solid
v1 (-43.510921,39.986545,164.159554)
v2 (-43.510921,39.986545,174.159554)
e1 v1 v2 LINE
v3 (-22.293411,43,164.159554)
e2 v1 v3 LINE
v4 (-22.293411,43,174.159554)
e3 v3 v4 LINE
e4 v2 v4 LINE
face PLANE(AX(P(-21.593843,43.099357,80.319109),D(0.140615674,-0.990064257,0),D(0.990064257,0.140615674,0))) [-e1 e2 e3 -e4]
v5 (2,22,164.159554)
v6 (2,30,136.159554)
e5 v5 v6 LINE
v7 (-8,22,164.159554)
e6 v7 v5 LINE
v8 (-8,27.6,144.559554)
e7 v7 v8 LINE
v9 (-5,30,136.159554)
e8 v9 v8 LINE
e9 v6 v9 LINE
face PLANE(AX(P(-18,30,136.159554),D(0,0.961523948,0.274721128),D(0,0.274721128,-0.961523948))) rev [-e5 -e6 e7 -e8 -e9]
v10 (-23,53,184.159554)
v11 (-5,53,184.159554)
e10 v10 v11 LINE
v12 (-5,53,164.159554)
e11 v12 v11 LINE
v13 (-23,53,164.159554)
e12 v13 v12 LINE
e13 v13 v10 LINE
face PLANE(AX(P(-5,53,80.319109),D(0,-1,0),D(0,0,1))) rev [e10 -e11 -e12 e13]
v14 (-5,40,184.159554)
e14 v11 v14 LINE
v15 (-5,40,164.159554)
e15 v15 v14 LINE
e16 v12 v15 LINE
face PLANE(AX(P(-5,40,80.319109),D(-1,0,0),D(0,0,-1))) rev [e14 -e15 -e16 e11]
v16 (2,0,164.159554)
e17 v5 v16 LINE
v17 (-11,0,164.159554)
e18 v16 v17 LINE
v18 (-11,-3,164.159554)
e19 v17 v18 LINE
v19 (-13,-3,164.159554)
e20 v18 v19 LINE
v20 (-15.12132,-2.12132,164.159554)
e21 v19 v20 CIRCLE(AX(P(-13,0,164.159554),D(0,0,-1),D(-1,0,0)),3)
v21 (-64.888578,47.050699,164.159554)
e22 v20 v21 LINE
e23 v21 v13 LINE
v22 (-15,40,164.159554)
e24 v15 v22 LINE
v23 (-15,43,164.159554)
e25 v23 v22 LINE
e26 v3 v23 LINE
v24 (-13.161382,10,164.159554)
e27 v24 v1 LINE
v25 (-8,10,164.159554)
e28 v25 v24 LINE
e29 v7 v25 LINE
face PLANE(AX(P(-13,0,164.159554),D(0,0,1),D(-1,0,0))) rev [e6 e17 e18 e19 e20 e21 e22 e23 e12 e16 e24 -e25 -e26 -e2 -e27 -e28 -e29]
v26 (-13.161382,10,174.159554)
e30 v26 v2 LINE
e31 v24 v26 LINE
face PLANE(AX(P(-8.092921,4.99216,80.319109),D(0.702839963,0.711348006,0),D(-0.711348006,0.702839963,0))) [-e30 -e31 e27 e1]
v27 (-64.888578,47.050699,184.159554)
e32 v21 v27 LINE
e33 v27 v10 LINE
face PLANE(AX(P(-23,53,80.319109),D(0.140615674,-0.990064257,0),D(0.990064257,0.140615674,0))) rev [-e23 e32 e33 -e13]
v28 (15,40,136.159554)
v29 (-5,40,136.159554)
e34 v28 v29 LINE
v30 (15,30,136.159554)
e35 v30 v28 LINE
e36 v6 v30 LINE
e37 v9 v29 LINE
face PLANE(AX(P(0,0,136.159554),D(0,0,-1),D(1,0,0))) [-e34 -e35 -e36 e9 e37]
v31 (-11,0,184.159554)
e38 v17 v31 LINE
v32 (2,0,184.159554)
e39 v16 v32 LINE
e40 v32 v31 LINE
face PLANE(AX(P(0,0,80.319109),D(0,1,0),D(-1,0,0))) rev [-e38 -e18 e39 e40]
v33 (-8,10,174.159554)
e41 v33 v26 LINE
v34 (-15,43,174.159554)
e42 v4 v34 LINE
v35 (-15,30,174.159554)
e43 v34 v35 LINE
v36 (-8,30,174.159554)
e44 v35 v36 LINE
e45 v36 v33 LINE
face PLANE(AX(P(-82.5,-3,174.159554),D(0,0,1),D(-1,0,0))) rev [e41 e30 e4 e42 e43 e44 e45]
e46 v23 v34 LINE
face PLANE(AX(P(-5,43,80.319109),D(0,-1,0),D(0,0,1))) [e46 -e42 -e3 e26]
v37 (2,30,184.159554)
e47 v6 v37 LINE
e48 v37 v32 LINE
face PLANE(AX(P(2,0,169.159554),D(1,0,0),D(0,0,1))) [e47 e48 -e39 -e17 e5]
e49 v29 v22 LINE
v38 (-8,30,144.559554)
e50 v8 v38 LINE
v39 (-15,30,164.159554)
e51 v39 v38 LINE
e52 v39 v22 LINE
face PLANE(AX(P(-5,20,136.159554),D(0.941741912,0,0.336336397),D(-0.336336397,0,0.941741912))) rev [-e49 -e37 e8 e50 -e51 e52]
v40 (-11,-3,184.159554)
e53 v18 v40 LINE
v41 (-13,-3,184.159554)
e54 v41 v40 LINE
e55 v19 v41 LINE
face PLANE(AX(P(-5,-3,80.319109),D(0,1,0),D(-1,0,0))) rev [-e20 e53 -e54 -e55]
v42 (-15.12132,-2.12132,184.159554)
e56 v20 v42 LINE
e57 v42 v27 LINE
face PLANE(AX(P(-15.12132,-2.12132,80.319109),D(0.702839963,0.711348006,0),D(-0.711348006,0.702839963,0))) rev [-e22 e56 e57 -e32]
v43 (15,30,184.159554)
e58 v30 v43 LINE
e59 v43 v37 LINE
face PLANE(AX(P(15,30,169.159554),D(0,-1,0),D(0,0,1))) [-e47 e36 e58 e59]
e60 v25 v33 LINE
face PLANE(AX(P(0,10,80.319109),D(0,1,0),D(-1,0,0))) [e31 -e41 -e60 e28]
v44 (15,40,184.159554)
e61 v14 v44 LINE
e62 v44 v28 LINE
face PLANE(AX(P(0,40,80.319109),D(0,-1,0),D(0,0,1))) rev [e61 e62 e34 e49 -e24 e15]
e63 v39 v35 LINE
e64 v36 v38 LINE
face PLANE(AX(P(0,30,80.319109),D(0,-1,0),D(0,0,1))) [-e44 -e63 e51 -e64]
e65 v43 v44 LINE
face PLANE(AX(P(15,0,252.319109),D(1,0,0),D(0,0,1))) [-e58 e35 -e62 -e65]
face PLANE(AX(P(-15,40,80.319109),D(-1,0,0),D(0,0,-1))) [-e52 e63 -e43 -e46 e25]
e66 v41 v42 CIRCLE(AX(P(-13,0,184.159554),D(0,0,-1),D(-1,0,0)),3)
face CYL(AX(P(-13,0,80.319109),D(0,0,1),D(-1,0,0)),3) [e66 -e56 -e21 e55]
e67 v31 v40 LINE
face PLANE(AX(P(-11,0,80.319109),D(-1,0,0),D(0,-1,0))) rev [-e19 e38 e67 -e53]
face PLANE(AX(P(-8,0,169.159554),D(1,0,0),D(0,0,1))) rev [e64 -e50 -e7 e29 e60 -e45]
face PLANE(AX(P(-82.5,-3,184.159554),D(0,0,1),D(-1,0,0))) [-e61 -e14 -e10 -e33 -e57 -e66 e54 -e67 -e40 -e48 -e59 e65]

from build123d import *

# Parameters (mm, degrees)
EXTRUDE_1_DEPTH       = 172
SHELL_START           = 6
SHELL_1_DEPTH         = 160
SKETCH_2_W            = 36
SKETCH_2_H            = 16
CUT_EXTRUDE_1_DEPTH   = 74
EXTRUDE_2_DEPTH       = 2
SKETCH_4_R            = 10
CUT_EXTRUDE_2_DEPTH   = 186
SKETCH_5_R            = 1.5
CUT_EXTRUDE_3_DEPTH   = 10
EXTRUDE_3_DEPTH       = 172
SKETCH_7_W            = 36
SKETCH_7_H            = 16
CUT_EXTRUDE_4_DEPTH   = 172
SKETCH_8_W            = 6
SKETCH_8_H            = 172
CUT_EXTRUDE_5_DEPTH   = 3
EXTRUDE_4_DEPTH       = 15
CHAMFER_1_SIZE        = 15
CHAMFER_2_SIZE        = 15
CHAMFER_3_SIZE        = 8
SKETCH_10_R           = 1.35
CUT_EXTRUDE_6_DEPTH   = 15
SKETCH_12_R           = 1.35
CUT_EXTRUDE_7_DEPTH   = 15
SKETCH_14_OUTSIDE_W   = 213.548
SKETCH_14_OUTSIDE_H   = 97.548
SKETCH_14_OUTSIDE_W_2 = 15
SKETCH_14_OUTSIDE_H_2 = 56
CUT_EXTRUDE_8_DEPTH   = 82.5
EXTRUDE_5_DEPTH       = 15
CUT_EXTRUDE_9_DEPTH   = 15
SKETCH_17_W           = 13
SKETCH_17_H           = 5
EXTRUDE_6_DEPTH       = 15
EXTRUDE_7_DEPTH       = 20
SHELL_START_2         = 78.159554327
SHELL_2_DEPTH         = 10
EXTRUDE_8_DEPTH       = 28
CUT_EXTRUDE_10_DEPTH  = 20
CUT_EXTRUDE_11_DEPTH  = 20
CUT_EXTRUDE_12_DEPTH  = 63


# Read off the part's stored shape, not the designer's step: 抽壳1, 抽壳2
with BuildPart() as part:
    # 草图1 → 凸台-拉伸1 (new body)
    with BuildSketch(Plane.XY):
        with BuildLine():
            Line((0, 0), (0, 40))
            Line((0, 40), (-5, 40))
            Line((-5, 40), (-5, 53))
            Line((-5, 53), (-23, 53))
            Line((-23, 53), (-64.888578151, 47.050698608))
            Line((-64.888578151, 47.050698608), (-15.121320344, -2.121320344))
            ThreePointArc((-15.121320344, -2.121320344), (-14.148050297, -2.771638598), (-13, -3))
            Line((-13, -3), (-5, -3))
            Line((-5, -3), (-5, 0))
            Line((-5, 0), (0, 0))
        make_face()
    extrude(amount=EXTRUDE_1_DEPTH)

    # 抽壳1 outline → 抽壳1 (cut)
    with BuildSketch(Plane.XY.offset(SHELL_START)):
        Polygon((-11, 6), (-6, 6), (-6, 34), (-11, 34), (-11, 47), (-22.576046832, 47), (-52.061983815, 42.812206246), (-11.767841448, 3), (-11, 3), align=None)
    extrude(amount=SHELL_1_DEPTH, mode=Mode.SUBTRACT)

    # 草图2 → 切除-拉伸1 (cut)
    with BuildSketch(Plane(origin=(0, 0, 0), x_dir=(0, 0, -1), z_dir=(1, 0, 0))):
        with Locations((-136, 10)):
            Rectangle(SKETCH_2_W, SKETCH_2_H)
        with Locations((-36, 10)):
            Rectangle(SKETCH_2_W, SKETCH_2_H)
    extrude(amount=-CUT_EXTRUDE_1_DEPTH, mode=Mode.SUBTRACT)

    # 草图3 → 凸台-拉伸2 (add, symmetric)
    with BuildSketch(Plane(origin=(0, 0, 86), x_dir=(-1, 0, 0), z_dir=(0, 0, -1))):
        Polygon((5, 53), (5, 40), (0, 40), (0, 0), (5, 0), (5, -3), (13, -3), (16.579355858, -0.680723591), (64.888578151, 47.050698608), (23, 53), align=None)
    extrude(amount=EXTRUDE_2_DEPTH, both=True)

    # 草图4 → 切除-拉伸2 (cut)
    with BuildSketch(Plane.XY.offset(172)):
        with Locations((-15, 21.071297481)):
            Circle(SKETCH_4_R)
    extrude(amount=-CUT_EXTRUDE_2_DEPTH, mode=Mode.SUBTRACT)

    # 草图5 → 切除-拉伸3 (cut)
    with BuildSketch(Plane(origin=(0, 53, 0), x_dir=(1, 0, 0), z_dir=(0, 1, 0))):
        with Locations(Location((-13.338195438, -63.5, 0), (0, 0, 270))):
            Circle(SKETCH_5_R)
        with Locations(Location((-13.338195438, -108.5, 0), (0, 0, 270))):
            Circle(SKETCH_5_R)
    extrude(amount=-CUT_EXTRUDE_3_DEPTH, mode=Mode.SUBTRACT)

    # 草图6 → 凸台-拉伸3 (add)
    with BuildSketch(Plane.XY.offset(172)):
        Polygon((-11, 6), (-14.804157153, 6), (-11.767841448, 3), (-11, 3), align=None)
    extrude(amount=-EXTRUDE_3_DEPTH)

    # 草图7 → 切除-拉伸4 (cut)
    with BuildSketch(Plane(origin=(0, 0, 0), x_dir=(0, 0, -1), z_dir=(1, 0, 0))):
        with Locations((-136, 10)):
            Rectangle(SKETCH_7_W, SKETCH_7_H)
        with Locations((-36, 10)):
            Rectangle(SKETCH_7_W, SKETCH_7_H)
    extrude(amount=-CUT_EXTRUDE_4_DEPTH, mode=Mode.SUBTRACT)

    # 草图8 → 切除-拉伸5 (cut)
    with BuildSketch(Plane.XZ.offset(3)):
        with Locations((-8, 86)):
            Rectangle(SKETCH_8_W, SKETCH_8_H)
    extrude(amount=-CUT_EXTRUDE_5_DEPTH, mode=Mode.SUBTRACT)

    # 草图9 → 凸台-拉伸4 (add)
    with BuildSketch(Plane(origin=(0, 0, 0), x_dir=(0, 0, -1), z_dir=(1, 0, 0))):
        Polygon((-86, 40), (-151, 40), (-151, 35), (-86, 35), (-21, 35), (-21, 40), align=None)
    extrude(amount=EXTRUDE_4_DEPTH)

    # 倒角1
    chamfer_1_edges = [part.edges().sort_by_distance(p)[0] for p in [
        (15, 37.5, 151),
    ]]
    chamfer(chamfer_1_edges, length=CHAMFER_1_SIZE - 0.0001)  # a hair under: the kernel refuses the full size

    # 倒角2
    chamfer_2_edges = [part.edges().sort_by_distance(p)[0] for p in [
        (15, 37.5, 21),
    ]]
    chamfer(chamfer_2_edges, length=CHAMFER_2_SIZE - 0.0001)  # a hair under: the kernel refuses the full size

    # 倒角3
    chamfer_3_edges = [part.edges().sort_by_distance(p)[0] for p in [
        (0, 35, 86),
    ]]
    chamfer(chamfer_3_edges, length=CHAMFER_3_SIZE)

    # 草图10 → 切除-拉伸6 (cut)
    with BuildSketch(Plane.XZ):
        with Locations((-5, 158)):
            Circle(SKETCH_10_R)
        with Locations((-5, 111)):
            Circle(SKETCH_10_R)
        with Locations((-5, 61)):
            Circle(SKETCH_10_R)
        with Locations((-5, 14.01360213)):
            Circle(SKETCH_10_R)
    extrude(amount=-CUT_EXTRUDE_6_DEPTH, mode=Mode.SUBTRACT)

    # 草图12 → 切除-拉伸7 (cut)
    with BuildSketch(Plane(origin=(0, 40, 0), x_dir=(1, 0, 0), z_dir=(0, 1, 0))):
        with Locations(Location((5, -41, 0), (0, 0, 270))):
            Circle(SKETCH_12_R)
        with Locations(Location((5, -86, 0), (0, 0, 270))):
            Circle(SKETCH_12_R)
        with Locations(Location((5, -131, 0), (0, 0, 270))):
            Circle(SKETCH_12_R)
    extrude(amount=-CUT_EXTRUDE_7_DEPTH, mode=Mode.SUBTRACT)

    # 草图14 outside → 切除-拉伸8 (cut, symmetric)
    with BuildSketch(Plane(origin=(0, 0, 0), x_dir=(0, 0, -1), z_dir=(1, 0, 0))):
        with Locations((-86, 25)):
            Rectangle(SKETCH_14_OUTSIDE_W, SKETCH_14_OUTSIDE_H)
        with Locations((-75.659554327, 25)):
            Rectangle(SKETCH_14_OUTSIDE_W_2, SKETCH_14_OUTSIDE_H_2, mode=Mode.SUBTRACT)
    extrude(amount=CUT_EXTRUDE_8_DEPTH, both=True, mode=Mode.SUBTRACT)

    # 草图15 → 凸台-拉伸5 (add)
    with BuildSketch(Plane(origin=(0, 0, 68.159554327), x_dir=(-1, 0, 0), z_dir=(0, 0, -1))):
        Polygon((0, 0), (-2, 0), (-2, 29), (0, 27), align=None)
    extrude(amount=-EXTRUDE_5_DEPTH)

    # 草图16 → 切除-拉伸9 (cut)
    with BuildSketch(Plane(origin=(0, 0, 68.159554327), x_dir=(-1, 0, 0), z_dir=(0, 0, -1))):
        Polygon((-2, 29), (-2, 35), (-8, 35), align=None)
    extrude(amount=-CUT_EXTRUDE_9_DEPTH, mode=Mode.SUBTRACT)

    # 草图17 → 凸台-拉伸6 (add)
    with BuildSketch(Plane(origin=(0, 0, 68.159554327), x_dir=(-1, 0, 0), z_dir=(0, 0, -1))):
        with Locations((-8.5, 32.5)):
            Rectangle(SKETCH_17_W, SKETCH_17_H)
    extrude(amount=-EXTRUDE_6_DEPTH)

    # 草图18 → 凸台-拉伸7 (add)
    with BuildSketch(Plane(origin=(0, 0, 68.159554327), x_dir=(-1, 0, 0), z_dir=(0, 0, -1))):
        with BuildLine():
            Line((-15, 40), (-15, 30))
            Line((-15, 30), (-2, 30))
            Line((-2, 30), (-2, 0))
            Line((-2, 0), (11, 0))
            Line((11, 0), (11, -3))
            Line((11, -3), (13, -3))
            ThreePointArc((13, -3), (14.148050297, -2.771638598), (15.121320344, -2.121320344))
            Line((15.121320344, -2.121320344), (64.888578151, 47.050698608))
            Line((64.888578151, 47.050698608), (23, 53))
            Line((23, 53), (5, 53))
            Line((5, 53), (5, 40))
            Line((5, 40), (-15, 40))
        make_face()
    extrude(amount=-EXTRUDE_7_DEPTH)

    # 抽壳2 outline → 抽壳2 (cut)
    with BuildSketch(Plane.XY.offset(SHELL_START_2)):
        Polygon((-8, 30), (-15, 30), (-15, 43), (-22.293411387, 43), (-43.510920925, 39.986544671), (-13.161382076, 10), (-8, 10), align=None)
    extrude(amount=SHELL_2_DEPTH, mode=Mode.SUBTRACT)

    # 草图20 → 凸台-拉伸8 (add)
    with BuildSketch(Plane.XY.offset(88.159554327)):
        Polygon((15, 40), (-15, 40), (-15, 30), (-8, 30), (-8, 22), (2, 22), (2, 30), (15, 30), align=None)
    extrude(amount=EXTRUDE_8_DEPTH)

    # 草图21 → 切除-拉伸10 (cut)
    with BuildSketch(Plane(origin=(2, 0, 0), x_dir=(0, 0, -1), z_dir=(1, 0, 0))):
        Polygon((-116.159554327, 30), (-88.159554327, 22), (-116.159554327, 22), align=None)
    extrude(amount=-CUT_EXTRUDE_10_DEPTH, mode=Mode.SUBTRACT)

    # 草图22 → 切除-拉伸11 (cut)
    with BuildSketch(Plane(origin=(0, 40, 0), x_dir=(1, 0, 0), z_dir=(0, 1, 0))):
        Polygon((-8, -116.159554327), (-15, -116.159554327), (-15, -88.159554327), (-5, -116.159554327), align=None)
    extrude(amount=-CUT_EXTRUDE_11_DEPTH, mode=Mode.SUBTRACT)


with BuildPart() as body_2:
    # 镜向6: mirrored copy
    add(part.part.mirror(Plane.XY.offset(126.159554327)))


with BuildPart() as part_1:
    add(part.part)

    # 草图24 → 切除-拉伸12 (cut, symmetric)
    with BuildSketch(Plane(origin=(0, 40, 0), x_dir=(1, 0, 0), z_dir=(0, 1, 0))):
        Polygon((-102.39415219, -125.726561749), (32.776263332, -125.726561749), (42.64807393, -30.561512846), (-60.072475676, -35.644094183), align=None)
    extrude(amount=CUT_EXTRUDE_12_DEPTH, both=True, mode=Mode.SUBTRACT)


solid = body_2.part
